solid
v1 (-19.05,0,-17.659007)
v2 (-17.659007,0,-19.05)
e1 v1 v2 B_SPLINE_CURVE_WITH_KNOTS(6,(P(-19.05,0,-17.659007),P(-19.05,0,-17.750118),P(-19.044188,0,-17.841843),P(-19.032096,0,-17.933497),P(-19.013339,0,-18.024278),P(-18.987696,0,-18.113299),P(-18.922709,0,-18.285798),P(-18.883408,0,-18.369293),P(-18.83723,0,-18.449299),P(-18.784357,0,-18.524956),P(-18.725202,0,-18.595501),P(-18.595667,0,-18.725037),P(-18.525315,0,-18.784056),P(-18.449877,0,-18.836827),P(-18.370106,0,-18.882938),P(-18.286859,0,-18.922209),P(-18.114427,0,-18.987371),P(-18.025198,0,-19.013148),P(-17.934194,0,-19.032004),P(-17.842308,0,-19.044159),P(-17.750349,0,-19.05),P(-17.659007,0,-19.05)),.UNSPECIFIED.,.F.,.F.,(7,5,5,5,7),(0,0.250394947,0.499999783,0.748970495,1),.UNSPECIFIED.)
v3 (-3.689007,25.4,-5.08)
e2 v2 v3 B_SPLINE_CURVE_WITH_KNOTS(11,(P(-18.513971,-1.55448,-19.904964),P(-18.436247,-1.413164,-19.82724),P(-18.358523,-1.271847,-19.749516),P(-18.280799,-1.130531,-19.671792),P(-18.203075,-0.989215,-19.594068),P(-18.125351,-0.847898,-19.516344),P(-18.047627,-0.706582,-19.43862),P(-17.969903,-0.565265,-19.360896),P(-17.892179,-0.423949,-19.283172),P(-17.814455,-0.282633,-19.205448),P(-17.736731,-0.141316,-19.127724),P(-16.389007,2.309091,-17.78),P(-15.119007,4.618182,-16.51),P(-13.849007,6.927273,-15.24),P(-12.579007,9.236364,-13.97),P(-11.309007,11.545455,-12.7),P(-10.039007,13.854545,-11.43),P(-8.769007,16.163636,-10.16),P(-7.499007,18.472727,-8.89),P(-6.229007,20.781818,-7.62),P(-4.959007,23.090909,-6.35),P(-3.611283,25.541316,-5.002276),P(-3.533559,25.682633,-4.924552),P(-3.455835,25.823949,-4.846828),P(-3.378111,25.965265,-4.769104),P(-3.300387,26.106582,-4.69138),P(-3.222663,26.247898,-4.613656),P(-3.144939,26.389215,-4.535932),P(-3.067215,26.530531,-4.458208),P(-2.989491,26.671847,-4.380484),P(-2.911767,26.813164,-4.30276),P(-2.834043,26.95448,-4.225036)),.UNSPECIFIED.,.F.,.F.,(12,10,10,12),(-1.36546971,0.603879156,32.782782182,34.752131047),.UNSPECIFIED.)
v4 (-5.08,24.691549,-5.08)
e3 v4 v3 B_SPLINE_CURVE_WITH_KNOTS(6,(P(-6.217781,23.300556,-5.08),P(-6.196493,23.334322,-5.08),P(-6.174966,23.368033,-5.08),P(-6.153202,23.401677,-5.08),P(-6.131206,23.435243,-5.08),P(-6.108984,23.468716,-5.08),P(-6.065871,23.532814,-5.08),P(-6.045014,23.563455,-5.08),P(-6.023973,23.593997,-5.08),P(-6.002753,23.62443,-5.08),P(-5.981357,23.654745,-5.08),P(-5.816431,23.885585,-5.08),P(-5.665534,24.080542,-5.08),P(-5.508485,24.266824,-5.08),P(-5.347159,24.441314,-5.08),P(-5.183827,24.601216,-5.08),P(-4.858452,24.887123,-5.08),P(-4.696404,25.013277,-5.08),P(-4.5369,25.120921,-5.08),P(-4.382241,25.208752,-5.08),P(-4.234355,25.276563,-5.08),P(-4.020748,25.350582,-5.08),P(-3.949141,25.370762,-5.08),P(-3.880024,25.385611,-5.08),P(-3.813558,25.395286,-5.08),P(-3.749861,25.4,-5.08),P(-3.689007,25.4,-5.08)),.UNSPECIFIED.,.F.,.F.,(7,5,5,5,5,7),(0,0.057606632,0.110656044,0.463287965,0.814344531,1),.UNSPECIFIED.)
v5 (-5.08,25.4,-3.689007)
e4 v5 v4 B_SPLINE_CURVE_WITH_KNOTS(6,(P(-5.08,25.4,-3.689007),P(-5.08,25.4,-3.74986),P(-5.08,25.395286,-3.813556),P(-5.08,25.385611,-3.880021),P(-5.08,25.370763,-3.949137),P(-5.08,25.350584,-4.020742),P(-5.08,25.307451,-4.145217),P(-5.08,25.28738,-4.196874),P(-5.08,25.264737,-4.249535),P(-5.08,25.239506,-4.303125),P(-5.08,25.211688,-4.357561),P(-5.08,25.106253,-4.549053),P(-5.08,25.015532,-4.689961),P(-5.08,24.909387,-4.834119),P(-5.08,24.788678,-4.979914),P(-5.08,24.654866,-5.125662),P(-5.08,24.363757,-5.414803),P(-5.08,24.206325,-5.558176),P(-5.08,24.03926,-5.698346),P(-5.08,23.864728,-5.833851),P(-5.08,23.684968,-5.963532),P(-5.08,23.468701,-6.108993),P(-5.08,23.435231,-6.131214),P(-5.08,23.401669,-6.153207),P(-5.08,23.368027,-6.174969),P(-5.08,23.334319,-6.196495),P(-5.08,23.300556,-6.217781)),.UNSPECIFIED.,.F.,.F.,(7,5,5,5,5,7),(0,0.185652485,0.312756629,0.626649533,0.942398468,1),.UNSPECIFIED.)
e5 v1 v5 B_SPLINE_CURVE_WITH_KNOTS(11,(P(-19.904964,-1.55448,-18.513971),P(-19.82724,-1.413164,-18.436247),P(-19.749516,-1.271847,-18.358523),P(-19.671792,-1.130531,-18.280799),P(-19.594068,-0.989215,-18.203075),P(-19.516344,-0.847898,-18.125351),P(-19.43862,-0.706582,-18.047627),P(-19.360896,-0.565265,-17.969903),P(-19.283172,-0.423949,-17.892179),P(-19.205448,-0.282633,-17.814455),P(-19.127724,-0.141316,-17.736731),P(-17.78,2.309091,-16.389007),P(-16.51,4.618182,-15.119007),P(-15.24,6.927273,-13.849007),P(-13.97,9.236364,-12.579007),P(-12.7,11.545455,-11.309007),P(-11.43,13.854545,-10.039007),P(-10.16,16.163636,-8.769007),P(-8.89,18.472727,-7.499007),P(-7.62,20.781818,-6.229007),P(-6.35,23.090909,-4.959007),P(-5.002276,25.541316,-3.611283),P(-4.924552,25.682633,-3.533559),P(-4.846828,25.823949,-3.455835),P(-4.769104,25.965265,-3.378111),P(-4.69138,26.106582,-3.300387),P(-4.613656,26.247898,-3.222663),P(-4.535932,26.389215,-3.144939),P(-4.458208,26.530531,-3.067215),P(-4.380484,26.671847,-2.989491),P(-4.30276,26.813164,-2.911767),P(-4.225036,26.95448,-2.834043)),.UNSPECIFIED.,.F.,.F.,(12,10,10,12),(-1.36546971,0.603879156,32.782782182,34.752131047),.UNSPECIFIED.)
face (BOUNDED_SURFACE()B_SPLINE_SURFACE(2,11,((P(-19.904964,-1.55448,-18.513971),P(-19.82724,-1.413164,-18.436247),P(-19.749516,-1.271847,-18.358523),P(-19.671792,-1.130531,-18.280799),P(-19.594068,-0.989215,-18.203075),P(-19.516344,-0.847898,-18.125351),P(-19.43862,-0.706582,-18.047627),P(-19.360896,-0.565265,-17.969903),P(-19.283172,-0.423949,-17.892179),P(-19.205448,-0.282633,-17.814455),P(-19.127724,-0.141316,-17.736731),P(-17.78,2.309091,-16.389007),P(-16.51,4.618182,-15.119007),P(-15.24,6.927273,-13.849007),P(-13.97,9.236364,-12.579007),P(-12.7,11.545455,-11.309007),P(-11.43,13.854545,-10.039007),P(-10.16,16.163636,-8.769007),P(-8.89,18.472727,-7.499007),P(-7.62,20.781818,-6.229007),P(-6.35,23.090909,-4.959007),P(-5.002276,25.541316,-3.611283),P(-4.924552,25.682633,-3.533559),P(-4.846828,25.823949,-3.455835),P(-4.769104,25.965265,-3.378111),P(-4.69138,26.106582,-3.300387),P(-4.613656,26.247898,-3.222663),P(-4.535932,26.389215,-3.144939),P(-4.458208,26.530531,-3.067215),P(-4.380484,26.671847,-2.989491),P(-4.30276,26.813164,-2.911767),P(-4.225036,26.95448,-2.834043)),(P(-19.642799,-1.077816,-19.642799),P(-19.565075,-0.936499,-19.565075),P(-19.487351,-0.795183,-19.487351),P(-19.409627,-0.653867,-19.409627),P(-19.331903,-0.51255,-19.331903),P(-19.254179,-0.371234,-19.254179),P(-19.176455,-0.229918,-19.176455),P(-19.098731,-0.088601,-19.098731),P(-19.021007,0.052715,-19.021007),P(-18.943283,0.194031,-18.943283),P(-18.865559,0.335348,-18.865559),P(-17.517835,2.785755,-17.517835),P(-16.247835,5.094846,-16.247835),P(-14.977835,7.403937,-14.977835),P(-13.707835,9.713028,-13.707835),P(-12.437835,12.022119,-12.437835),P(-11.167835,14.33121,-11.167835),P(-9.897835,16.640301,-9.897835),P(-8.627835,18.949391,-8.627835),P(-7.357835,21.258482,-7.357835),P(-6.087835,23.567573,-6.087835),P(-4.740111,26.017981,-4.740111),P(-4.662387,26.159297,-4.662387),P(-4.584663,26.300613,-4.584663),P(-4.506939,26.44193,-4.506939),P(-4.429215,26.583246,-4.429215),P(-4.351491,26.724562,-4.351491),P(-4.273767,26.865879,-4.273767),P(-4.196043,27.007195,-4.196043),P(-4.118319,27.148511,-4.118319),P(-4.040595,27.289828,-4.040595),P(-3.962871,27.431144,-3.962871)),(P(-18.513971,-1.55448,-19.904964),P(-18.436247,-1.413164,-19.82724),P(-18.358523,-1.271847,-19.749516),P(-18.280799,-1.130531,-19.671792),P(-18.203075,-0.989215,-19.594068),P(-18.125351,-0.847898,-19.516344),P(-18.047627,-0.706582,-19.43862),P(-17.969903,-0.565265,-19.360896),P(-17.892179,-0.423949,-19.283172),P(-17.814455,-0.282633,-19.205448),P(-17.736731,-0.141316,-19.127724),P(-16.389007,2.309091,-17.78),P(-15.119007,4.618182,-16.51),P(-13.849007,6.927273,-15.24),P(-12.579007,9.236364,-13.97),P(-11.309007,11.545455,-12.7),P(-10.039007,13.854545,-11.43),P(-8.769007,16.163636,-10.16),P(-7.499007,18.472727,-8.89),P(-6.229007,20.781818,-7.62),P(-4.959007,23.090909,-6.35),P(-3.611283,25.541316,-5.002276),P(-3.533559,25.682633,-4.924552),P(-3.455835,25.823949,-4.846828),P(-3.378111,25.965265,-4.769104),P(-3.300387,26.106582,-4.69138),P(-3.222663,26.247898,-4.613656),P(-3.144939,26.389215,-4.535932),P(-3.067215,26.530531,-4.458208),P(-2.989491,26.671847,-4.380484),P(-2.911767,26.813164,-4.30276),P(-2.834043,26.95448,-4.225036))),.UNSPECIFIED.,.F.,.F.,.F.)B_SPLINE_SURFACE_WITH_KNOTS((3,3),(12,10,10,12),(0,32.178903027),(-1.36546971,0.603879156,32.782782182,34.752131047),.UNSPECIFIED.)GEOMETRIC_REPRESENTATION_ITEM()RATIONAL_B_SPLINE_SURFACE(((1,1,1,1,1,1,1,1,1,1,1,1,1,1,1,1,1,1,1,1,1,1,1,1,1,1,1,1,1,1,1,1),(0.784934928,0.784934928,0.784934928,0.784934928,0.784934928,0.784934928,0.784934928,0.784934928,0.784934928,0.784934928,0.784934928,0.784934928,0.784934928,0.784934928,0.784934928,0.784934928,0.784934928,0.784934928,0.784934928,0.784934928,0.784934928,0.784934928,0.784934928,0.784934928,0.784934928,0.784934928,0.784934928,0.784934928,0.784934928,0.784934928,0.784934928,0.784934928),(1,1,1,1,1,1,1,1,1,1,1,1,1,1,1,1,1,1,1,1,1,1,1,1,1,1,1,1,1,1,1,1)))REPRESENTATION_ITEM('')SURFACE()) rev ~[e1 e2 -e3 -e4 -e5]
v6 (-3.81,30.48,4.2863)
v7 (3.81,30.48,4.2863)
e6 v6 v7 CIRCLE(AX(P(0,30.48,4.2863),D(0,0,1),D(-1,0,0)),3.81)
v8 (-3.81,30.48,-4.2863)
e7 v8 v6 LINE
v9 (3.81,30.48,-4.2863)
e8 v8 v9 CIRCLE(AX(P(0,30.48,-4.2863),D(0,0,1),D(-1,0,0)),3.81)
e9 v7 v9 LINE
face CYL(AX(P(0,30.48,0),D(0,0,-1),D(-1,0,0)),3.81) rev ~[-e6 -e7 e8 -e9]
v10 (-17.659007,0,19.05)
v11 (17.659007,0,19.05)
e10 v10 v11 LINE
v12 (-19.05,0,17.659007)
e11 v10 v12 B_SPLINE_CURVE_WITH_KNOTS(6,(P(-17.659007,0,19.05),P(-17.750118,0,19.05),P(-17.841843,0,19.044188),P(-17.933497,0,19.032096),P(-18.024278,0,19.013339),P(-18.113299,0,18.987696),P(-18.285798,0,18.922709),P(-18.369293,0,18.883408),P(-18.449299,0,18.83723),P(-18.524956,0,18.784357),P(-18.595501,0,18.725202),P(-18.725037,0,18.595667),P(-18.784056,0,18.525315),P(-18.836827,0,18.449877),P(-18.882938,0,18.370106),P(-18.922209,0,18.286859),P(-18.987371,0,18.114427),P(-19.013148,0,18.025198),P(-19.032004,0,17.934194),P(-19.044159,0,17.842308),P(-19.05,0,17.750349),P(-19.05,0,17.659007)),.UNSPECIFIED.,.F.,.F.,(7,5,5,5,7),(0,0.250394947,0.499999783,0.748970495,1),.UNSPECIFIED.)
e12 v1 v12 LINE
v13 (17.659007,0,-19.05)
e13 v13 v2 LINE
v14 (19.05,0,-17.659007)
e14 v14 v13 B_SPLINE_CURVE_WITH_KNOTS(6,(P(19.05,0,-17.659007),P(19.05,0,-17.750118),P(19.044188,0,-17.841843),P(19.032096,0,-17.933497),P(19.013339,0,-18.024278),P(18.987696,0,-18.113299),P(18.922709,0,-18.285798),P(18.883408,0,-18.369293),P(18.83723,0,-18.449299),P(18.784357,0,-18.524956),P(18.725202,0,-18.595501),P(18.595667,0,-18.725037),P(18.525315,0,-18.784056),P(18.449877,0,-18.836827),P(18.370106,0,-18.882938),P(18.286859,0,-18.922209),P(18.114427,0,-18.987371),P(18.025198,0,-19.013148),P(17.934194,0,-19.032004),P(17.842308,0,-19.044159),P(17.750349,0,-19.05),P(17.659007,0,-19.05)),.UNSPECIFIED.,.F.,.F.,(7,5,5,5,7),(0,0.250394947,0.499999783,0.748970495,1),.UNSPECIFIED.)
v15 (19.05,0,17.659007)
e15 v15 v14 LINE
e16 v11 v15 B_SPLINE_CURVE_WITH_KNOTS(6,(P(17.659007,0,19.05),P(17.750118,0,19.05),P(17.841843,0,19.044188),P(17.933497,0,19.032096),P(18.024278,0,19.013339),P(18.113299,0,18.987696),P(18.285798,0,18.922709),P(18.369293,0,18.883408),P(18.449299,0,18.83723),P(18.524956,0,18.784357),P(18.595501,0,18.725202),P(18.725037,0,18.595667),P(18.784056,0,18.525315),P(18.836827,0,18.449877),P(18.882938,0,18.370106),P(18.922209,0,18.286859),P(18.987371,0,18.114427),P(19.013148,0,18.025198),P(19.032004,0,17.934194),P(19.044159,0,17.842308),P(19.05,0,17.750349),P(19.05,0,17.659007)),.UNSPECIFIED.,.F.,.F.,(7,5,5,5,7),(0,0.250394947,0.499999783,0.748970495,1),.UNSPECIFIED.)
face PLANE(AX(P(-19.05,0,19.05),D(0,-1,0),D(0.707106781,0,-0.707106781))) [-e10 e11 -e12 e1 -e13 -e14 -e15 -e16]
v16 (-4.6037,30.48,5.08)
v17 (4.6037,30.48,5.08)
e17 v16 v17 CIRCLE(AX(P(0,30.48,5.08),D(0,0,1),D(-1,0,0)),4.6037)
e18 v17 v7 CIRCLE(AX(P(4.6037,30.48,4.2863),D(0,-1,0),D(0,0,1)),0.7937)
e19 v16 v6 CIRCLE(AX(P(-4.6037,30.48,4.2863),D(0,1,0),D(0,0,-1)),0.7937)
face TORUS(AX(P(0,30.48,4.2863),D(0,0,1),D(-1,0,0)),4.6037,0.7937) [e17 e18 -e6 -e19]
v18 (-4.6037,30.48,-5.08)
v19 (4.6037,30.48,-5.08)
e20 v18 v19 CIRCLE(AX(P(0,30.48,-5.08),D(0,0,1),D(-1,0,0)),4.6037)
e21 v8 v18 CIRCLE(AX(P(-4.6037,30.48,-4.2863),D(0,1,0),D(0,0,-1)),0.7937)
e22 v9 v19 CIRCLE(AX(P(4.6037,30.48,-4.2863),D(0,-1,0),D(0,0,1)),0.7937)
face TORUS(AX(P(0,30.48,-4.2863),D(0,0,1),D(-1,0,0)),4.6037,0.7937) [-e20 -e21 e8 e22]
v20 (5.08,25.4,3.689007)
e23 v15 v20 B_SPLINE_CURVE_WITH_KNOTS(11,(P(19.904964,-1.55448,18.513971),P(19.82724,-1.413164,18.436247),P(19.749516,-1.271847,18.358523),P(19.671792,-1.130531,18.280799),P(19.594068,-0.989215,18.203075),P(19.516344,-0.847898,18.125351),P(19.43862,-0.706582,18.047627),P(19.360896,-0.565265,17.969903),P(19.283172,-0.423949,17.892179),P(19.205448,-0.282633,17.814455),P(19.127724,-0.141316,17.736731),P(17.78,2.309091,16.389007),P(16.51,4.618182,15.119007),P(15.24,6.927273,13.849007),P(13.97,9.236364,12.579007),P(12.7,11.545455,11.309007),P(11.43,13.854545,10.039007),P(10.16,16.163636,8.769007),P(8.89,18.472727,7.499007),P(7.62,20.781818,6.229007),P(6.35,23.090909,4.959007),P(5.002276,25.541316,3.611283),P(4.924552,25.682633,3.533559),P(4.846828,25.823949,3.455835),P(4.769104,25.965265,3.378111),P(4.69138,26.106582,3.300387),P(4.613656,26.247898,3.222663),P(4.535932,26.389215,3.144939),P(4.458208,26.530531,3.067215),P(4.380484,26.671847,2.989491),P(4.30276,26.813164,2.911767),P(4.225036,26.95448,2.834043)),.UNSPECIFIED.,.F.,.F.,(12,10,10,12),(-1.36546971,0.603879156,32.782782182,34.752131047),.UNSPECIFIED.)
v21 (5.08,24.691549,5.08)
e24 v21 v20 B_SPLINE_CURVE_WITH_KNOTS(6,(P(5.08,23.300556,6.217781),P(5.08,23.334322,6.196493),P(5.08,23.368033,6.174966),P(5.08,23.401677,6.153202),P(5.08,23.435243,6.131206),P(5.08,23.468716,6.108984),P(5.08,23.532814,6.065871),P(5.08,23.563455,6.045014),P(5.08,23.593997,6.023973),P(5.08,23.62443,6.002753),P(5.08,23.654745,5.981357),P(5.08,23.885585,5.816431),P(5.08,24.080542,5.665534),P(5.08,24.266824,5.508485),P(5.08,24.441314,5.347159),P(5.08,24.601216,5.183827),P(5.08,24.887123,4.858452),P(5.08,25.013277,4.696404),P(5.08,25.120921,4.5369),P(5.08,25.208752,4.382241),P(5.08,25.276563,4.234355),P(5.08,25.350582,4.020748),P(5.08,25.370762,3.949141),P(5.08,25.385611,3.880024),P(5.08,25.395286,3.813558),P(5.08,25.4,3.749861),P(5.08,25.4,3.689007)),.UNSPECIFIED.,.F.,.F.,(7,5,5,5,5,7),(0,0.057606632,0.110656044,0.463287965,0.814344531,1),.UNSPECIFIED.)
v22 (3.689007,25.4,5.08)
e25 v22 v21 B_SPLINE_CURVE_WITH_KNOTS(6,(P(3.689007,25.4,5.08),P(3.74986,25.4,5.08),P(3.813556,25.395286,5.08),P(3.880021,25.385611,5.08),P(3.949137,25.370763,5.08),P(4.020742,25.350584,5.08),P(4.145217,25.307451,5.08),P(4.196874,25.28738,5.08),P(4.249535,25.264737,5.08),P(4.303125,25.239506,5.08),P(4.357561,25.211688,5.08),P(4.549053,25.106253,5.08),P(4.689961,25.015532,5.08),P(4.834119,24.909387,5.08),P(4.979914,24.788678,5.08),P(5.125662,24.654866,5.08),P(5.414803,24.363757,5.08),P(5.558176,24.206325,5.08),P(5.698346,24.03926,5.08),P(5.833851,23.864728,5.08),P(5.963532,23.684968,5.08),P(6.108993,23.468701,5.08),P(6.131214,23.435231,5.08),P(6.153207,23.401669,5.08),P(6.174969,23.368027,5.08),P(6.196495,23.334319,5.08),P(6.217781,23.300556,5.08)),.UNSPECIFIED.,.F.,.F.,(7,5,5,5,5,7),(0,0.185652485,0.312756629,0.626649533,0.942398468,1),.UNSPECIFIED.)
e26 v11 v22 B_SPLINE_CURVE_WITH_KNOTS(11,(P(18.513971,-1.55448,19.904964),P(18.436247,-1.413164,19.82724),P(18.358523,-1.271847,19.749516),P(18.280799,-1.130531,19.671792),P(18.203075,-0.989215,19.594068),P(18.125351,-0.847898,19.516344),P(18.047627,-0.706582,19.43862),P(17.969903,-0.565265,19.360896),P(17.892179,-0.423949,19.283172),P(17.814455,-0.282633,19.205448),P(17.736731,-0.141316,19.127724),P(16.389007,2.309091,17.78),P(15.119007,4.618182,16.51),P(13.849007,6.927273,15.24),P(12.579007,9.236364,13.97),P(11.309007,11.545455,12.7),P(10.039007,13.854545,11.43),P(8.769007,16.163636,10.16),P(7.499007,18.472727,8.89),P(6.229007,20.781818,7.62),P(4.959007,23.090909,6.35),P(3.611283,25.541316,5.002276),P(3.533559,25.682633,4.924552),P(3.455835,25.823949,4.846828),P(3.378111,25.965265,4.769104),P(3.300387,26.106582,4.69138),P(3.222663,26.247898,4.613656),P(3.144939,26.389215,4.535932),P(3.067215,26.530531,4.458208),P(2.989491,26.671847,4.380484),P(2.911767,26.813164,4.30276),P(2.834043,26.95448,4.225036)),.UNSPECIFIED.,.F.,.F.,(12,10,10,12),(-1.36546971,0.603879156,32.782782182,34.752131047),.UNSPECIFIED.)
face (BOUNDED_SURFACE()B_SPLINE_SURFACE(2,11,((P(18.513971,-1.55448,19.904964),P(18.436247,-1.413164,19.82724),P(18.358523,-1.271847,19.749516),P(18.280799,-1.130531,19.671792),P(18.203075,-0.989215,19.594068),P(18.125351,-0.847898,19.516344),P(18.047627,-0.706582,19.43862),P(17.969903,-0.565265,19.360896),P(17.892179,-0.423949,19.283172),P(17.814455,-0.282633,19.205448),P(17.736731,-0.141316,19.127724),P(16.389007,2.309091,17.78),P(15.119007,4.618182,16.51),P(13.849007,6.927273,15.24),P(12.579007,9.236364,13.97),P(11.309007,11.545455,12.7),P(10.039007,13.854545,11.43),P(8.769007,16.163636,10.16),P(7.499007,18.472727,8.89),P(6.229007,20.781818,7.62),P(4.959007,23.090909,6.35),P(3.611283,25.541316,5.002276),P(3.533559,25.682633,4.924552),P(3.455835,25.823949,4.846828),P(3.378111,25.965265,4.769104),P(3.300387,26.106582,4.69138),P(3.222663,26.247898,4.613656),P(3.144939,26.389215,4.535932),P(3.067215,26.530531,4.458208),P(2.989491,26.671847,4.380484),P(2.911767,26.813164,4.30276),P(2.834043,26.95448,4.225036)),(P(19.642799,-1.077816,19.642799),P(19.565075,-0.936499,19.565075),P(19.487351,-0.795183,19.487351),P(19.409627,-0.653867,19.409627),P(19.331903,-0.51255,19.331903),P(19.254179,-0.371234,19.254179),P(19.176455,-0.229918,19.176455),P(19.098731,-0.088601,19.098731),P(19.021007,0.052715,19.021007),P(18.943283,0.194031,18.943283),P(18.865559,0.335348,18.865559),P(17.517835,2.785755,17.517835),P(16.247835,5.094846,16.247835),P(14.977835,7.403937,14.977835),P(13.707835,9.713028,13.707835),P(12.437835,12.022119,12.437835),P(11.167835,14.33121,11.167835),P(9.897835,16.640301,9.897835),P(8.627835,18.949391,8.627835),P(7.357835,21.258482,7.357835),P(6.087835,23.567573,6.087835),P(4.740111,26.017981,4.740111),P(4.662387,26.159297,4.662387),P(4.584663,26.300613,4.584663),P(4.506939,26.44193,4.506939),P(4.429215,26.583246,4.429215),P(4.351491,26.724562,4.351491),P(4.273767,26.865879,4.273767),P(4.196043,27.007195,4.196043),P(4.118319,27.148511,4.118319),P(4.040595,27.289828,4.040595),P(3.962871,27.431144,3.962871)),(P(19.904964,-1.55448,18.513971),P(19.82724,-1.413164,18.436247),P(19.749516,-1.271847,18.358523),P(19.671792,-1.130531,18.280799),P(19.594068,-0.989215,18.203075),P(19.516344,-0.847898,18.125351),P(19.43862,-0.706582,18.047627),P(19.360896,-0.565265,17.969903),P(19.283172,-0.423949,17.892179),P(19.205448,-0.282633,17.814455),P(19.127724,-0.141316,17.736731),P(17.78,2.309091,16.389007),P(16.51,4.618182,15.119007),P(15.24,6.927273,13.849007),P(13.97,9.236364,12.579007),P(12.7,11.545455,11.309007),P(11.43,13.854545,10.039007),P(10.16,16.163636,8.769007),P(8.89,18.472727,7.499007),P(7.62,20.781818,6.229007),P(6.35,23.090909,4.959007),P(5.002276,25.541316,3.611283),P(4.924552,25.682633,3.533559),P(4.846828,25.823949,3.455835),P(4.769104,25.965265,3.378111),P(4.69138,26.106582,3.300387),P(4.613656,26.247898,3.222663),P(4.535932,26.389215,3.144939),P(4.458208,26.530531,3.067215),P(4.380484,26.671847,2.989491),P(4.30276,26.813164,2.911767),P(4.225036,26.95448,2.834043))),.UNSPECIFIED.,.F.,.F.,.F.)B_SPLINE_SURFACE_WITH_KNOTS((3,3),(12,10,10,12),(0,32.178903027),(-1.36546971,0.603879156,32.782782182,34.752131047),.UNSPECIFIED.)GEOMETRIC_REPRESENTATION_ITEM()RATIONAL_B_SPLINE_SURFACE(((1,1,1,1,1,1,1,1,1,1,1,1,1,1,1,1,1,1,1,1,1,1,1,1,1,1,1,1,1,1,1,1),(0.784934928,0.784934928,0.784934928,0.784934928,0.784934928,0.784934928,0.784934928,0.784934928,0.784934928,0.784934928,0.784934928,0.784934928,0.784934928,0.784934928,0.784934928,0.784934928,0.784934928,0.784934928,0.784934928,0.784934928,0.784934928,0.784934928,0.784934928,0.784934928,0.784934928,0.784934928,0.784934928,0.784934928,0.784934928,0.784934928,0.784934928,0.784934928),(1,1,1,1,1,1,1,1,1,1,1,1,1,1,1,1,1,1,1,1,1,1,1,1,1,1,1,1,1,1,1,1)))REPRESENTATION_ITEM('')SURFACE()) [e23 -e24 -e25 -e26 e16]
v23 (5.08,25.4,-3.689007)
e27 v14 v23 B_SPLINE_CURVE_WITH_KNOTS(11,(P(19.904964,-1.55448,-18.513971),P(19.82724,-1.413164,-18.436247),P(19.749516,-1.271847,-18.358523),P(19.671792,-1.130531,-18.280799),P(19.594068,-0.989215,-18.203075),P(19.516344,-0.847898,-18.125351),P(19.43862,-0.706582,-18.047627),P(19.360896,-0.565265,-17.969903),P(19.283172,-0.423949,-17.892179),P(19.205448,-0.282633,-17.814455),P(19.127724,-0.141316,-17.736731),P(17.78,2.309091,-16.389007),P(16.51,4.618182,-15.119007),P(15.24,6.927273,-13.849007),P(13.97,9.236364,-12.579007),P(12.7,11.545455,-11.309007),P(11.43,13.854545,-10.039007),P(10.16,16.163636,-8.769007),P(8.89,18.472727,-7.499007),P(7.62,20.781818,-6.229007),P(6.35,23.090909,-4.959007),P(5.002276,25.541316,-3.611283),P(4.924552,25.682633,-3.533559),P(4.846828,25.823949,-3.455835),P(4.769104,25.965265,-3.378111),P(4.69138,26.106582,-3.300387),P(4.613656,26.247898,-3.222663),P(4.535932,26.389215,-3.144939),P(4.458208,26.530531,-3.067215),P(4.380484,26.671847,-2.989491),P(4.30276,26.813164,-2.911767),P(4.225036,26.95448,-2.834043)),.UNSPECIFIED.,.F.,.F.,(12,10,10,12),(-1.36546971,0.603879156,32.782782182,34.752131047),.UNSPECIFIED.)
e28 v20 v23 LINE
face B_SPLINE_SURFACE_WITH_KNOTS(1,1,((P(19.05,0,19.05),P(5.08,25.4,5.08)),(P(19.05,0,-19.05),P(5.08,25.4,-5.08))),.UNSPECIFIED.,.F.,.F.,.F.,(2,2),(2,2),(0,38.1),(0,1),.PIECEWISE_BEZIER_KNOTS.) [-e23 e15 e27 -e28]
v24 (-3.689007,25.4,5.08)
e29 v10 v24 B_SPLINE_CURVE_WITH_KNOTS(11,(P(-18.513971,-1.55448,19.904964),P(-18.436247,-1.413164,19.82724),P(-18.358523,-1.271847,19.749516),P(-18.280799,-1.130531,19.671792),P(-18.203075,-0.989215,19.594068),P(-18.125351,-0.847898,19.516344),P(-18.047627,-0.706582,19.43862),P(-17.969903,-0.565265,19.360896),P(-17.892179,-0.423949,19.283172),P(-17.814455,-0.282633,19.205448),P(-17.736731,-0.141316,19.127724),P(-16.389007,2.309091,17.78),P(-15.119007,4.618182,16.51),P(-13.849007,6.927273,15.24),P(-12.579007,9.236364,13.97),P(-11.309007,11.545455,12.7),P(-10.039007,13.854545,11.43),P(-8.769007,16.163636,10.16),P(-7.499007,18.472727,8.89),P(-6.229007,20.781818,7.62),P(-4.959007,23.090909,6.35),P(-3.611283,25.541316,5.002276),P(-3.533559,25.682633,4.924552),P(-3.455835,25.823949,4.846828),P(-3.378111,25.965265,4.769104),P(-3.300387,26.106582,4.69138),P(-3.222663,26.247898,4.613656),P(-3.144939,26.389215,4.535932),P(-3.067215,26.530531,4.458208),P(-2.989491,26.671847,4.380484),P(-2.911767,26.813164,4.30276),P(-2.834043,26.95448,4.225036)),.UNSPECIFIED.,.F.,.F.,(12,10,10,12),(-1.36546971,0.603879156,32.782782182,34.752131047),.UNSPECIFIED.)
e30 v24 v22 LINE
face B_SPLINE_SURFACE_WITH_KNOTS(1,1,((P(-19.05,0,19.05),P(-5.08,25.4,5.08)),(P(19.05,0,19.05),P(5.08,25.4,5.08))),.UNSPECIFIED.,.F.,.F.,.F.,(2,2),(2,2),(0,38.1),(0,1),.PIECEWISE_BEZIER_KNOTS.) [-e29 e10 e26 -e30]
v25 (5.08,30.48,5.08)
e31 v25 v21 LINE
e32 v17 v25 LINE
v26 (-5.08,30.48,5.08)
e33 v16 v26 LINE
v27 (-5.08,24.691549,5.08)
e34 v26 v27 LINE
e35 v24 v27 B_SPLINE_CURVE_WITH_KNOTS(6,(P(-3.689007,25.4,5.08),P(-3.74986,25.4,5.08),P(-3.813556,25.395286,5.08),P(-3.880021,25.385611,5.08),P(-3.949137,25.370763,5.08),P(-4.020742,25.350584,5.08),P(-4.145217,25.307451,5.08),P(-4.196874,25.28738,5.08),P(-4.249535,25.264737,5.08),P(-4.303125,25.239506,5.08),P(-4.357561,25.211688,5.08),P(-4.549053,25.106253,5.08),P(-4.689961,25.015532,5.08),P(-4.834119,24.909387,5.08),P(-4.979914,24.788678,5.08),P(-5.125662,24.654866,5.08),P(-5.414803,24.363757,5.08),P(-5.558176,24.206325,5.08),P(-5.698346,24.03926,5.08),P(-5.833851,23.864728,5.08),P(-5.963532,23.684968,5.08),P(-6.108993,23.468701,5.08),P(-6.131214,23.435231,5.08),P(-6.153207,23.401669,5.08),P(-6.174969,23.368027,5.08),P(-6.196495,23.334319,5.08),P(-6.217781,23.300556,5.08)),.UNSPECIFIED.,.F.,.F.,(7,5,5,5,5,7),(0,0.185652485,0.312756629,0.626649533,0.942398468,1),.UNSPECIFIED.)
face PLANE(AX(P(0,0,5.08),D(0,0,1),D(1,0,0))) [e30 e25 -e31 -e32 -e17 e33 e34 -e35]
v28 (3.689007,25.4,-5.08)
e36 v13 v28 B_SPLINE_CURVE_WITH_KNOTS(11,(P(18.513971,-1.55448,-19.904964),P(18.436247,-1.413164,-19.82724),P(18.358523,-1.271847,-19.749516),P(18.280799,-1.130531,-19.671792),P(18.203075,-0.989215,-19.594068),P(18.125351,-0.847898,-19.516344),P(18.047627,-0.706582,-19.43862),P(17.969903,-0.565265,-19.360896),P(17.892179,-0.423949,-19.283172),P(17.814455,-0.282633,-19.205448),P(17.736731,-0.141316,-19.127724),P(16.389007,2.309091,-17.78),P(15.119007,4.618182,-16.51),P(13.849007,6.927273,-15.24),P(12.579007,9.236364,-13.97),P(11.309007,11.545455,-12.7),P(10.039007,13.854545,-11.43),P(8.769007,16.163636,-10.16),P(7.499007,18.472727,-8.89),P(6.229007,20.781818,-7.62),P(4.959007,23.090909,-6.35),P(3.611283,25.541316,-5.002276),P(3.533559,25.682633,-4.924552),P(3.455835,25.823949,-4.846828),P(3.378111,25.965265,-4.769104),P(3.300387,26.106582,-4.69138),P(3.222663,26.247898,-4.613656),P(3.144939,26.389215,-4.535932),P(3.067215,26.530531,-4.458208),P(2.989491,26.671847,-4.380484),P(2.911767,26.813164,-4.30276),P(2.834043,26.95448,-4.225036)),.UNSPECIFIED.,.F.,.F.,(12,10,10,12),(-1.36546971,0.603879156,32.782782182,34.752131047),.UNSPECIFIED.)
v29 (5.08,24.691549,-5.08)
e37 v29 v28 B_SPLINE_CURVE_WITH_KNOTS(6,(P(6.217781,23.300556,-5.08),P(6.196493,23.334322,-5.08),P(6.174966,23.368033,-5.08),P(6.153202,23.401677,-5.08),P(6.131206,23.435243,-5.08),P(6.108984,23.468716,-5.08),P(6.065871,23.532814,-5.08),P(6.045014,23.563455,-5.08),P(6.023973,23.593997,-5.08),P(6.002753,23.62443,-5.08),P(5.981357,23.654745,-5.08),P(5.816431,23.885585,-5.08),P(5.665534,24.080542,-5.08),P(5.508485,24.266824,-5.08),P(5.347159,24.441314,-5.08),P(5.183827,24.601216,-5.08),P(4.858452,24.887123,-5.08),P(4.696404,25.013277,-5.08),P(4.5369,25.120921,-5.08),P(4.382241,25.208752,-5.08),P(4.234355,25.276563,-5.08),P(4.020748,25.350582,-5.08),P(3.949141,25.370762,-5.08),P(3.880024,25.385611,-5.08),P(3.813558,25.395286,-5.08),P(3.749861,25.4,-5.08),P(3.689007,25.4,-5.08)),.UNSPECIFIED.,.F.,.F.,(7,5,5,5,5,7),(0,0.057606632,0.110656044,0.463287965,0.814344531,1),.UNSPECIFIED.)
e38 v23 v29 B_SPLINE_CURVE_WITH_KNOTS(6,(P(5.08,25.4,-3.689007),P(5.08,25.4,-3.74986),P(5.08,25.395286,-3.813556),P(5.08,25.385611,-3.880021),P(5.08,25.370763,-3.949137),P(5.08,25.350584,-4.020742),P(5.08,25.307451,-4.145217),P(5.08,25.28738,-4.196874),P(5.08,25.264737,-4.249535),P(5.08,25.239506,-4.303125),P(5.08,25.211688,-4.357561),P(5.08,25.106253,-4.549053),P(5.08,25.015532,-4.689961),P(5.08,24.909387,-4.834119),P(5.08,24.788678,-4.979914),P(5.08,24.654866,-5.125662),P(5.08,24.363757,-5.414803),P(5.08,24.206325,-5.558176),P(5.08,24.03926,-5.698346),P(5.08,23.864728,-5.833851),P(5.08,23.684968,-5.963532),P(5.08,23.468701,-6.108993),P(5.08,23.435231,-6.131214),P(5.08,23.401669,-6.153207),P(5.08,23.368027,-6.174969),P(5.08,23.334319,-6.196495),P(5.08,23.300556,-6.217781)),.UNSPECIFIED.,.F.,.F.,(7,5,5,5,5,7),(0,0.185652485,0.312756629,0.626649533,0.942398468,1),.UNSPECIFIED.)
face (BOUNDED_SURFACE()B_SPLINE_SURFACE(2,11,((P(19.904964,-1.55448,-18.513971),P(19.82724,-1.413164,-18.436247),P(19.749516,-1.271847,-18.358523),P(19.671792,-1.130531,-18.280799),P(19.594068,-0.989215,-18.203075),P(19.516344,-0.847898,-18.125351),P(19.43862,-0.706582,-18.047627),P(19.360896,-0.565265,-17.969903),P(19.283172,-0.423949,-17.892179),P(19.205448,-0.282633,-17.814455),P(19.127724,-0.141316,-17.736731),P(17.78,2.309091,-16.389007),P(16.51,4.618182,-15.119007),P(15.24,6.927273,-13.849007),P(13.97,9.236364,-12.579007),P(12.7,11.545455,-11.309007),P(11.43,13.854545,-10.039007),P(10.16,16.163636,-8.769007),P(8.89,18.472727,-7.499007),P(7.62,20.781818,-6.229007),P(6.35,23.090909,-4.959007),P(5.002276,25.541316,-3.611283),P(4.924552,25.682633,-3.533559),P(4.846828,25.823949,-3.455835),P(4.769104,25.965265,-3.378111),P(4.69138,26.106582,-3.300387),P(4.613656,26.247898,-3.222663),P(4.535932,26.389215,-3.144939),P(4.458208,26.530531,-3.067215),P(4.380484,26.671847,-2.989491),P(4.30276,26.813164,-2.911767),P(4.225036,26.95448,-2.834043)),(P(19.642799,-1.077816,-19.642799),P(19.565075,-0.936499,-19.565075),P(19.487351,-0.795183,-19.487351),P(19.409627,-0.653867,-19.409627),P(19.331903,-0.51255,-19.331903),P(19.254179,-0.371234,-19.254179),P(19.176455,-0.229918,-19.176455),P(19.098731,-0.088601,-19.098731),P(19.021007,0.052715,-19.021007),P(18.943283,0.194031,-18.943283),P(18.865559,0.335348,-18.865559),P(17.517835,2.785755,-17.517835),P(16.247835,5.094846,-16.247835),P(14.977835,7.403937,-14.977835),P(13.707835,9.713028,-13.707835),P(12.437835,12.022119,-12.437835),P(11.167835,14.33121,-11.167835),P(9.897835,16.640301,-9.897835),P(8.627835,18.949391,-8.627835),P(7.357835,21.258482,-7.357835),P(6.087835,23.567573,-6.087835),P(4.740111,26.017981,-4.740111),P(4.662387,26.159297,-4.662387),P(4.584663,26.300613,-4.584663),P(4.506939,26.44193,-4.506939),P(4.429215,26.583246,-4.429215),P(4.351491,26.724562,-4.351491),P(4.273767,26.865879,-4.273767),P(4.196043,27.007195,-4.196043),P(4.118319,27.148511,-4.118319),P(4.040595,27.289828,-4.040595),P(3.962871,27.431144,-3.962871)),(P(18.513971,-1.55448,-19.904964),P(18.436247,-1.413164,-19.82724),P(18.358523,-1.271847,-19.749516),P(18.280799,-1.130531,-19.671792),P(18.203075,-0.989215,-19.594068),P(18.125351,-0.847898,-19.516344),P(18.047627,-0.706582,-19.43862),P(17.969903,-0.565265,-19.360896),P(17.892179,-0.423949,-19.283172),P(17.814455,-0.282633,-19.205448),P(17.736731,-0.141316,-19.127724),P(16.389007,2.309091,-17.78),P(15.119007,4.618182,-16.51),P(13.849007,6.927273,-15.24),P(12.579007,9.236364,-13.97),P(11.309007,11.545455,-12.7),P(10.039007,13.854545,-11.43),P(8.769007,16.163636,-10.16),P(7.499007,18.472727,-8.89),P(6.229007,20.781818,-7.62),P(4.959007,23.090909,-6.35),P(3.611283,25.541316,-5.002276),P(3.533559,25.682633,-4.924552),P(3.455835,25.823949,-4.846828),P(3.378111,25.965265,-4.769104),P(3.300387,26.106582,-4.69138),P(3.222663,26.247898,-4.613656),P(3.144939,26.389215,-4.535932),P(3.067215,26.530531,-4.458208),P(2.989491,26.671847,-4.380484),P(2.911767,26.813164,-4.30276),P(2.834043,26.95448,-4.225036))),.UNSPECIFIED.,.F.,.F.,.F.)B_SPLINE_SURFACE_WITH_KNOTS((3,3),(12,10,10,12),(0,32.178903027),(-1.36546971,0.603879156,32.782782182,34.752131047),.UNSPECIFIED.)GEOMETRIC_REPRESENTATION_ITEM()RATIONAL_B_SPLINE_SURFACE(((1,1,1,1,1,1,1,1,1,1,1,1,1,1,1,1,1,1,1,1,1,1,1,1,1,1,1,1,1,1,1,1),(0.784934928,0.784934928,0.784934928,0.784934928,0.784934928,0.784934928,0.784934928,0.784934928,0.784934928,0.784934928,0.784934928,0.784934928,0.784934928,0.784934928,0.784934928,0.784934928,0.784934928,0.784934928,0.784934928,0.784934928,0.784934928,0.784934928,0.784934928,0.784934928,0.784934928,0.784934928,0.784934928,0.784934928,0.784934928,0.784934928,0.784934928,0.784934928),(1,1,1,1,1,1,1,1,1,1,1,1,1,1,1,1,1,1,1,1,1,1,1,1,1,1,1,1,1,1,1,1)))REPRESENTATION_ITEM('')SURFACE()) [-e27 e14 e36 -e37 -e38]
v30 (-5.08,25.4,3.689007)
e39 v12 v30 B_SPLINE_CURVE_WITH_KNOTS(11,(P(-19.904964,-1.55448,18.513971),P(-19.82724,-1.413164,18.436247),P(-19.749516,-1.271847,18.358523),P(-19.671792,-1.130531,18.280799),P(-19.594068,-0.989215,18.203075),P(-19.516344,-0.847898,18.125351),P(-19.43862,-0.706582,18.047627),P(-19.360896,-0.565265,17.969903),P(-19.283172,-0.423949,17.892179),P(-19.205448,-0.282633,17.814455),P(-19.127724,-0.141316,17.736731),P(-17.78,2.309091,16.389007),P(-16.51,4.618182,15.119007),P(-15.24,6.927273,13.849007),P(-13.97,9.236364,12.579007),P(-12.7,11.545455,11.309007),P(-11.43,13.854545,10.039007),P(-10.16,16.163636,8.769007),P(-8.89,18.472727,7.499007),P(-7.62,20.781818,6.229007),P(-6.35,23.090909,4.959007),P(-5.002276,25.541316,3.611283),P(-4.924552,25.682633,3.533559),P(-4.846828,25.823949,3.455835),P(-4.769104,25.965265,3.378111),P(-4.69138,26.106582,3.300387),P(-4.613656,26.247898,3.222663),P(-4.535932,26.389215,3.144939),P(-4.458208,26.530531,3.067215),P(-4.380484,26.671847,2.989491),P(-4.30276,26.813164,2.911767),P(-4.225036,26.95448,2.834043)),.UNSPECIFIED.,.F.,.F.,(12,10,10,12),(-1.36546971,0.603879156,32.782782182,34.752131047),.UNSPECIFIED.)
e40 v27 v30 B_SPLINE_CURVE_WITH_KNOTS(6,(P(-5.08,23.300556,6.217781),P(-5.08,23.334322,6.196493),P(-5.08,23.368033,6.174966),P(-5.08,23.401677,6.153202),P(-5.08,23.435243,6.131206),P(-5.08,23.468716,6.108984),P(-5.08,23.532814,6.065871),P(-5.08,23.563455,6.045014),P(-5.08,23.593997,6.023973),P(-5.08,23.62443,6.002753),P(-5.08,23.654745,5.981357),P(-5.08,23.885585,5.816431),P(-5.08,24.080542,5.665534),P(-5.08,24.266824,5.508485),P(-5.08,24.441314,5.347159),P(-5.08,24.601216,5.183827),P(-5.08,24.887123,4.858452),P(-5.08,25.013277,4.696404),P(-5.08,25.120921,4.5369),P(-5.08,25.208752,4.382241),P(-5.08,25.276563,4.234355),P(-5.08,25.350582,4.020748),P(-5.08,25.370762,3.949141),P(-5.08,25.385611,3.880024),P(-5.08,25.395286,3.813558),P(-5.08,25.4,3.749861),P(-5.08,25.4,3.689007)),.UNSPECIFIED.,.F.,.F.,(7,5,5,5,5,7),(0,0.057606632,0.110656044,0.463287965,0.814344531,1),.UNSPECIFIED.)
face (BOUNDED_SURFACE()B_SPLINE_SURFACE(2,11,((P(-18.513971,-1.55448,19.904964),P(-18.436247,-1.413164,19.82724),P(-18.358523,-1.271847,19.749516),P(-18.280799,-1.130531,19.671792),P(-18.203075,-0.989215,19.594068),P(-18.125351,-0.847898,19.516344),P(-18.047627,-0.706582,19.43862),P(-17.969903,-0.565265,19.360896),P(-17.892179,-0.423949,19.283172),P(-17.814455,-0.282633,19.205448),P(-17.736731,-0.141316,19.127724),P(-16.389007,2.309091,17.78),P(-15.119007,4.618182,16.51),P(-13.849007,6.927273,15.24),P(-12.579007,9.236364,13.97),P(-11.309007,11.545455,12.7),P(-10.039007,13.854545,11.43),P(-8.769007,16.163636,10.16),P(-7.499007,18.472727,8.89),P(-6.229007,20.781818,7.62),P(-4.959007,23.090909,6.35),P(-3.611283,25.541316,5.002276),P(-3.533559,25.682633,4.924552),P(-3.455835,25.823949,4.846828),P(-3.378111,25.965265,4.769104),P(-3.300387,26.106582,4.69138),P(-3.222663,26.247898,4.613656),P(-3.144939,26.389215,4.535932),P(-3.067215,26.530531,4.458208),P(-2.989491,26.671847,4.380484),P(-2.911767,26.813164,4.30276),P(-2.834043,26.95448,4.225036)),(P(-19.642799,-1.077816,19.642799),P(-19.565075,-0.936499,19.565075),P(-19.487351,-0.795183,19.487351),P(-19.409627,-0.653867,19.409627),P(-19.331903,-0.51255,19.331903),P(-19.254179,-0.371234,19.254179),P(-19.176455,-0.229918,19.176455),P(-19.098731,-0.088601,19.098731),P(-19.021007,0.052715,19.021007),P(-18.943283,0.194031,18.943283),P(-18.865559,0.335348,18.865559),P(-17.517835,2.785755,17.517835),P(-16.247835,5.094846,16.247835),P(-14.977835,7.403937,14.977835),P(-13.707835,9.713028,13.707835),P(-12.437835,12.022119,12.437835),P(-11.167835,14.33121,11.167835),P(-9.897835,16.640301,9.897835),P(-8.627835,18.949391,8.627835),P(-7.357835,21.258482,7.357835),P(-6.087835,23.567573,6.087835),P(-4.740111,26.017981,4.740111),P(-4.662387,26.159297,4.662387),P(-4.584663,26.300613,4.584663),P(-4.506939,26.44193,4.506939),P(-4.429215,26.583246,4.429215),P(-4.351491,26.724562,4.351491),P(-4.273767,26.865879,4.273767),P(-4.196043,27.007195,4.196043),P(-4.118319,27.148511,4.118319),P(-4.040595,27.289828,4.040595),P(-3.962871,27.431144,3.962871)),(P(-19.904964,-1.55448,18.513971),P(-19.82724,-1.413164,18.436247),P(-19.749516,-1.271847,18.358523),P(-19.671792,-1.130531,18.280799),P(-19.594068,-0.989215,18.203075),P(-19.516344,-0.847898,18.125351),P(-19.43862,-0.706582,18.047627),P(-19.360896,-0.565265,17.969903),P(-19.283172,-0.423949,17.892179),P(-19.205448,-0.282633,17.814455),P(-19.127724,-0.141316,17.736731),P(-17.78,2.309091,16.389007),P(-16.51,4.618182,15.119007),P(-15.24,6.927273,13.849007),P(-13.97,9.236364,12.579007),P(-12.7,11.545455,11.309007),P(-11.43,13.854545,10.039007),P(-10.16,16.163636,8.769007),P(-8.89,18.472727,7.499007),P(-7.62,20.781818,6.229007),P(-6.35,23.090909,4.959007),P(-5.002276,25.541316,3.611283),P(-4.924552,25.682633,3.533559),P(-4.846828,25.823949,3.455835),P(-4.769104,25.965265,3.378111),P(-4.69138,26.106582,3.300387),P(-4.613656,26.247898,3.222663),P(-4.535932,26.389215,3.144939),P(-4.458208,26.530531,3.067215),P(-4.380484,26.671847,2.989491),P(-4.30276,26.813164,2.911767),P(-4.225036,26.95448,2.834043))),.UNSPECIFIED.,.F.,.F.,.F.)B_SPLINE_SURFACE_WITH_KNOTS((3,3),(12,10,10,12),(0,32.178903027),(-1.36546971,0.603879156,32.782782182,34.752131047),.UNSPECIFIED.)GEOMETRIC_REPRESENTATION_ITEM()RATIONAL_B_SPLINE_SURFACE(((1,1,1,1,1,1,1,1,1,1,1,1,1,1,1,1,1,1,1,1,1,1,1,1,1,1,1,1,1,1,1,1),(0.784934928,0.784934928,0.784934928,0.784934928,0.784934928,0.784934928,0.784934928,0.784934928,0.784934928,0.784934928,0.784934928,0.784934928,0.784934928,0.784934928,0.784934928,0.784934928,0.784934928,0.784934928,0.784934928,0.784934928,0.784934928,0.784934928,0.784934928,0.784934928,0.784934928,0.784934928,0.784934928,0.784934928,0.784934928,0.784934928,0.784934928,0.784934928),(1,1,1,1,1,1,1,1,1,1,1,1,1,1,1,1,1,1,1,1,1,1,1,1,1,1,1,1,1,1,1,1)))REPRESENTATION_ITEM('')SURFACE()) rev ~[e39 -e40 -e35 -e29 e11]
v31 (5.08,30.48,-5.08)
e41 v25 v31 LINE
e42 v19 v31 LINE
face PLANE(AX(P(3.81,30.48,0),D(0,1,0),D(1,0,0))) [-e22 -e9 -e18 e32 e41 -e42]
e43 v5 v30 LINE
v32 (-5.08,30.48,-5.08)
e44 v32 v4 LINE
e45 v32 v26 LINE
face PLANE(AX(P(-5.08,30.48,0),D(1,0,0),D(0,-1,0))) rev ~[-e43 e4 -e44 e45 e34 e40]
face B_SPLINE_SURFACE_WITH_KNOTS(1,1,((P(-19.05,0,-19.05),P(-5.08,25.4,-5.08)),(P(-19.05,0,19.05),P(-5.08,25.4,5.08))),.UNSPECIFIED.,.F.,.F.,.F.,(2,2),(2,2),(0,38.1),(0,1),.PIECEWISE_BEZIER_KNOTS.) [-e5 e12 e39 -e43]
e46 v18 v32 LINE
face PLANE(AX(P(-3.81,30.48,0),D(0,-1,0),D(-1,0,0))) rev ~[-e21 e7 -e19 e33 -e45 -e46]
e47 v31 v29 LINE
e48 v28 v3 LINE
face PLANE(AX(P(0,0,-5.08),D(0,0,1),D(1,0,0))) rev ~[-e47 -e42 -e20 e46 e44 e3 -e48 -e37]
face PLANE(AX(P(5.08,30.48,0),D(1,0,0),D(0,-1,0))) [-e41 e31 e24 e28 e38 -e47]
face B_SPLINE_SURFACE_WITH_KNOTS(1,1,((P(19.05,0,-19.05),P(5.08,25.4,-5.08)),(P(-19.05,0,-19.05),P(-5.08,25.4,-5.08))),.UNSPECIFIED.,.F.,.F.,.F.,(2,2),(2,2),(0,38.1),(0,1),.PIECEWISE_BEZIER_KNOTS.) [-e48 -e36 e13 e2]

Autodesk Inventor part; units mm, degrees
ref_plane "YZ Plane" through (0, 0, 0) normal (1, 0, 0) x (0, 1, 0)
sketch "Sketch1" plane through (0, 0, 0) normal (0, 1, 0) x (-1, 0, 0)
  line L0 (-19.05, 19.05) -> (-19.05, -19.05)
  line L1 (-19.05, -19.05) -> (19.05, -19.05)
  line L2 (19.05, -19.05) -> (19.05, 19.05)
  line L3 (19.05, 19.05) -> (-19.05, 19.05)
  line L4 (-19.05, 19.05) -> (19.05, -19.05) construction
  line L5 (-19.05, -19.05) -> (19.05, 19.05) construction
  point P0 (0, 0)
  dimension "base" = 38.1
ref_plane "Work Plane1" through (0, 25.4, 0) normal (0, 1, 0) x (-1, 0, 0)
sketch "Sketch2" plane through (0, 25.4, 0) normal (0, 1, 0) x (-1, 0, 0)
  line L0 (-5.08, 5.08) -> (-5.08, -5.08)
  line L1 (-5.08, -5.08) -> (5.08, -5.08)
  line L2 (5.08, -5.08) -> (5.08, 5.08)
  line L3 (5.08, 5.08) -> (-5.08, 5.08)
  line L4 (-5.08, 5.08) -> (5.08, -5.08) construction
  line L5 (-5.08, -5.08) -> (5.08, 5.08) construction
  point P0 (0, 0)
  dimension "topOfPyramid" = 10.16
loft "Loft1" add profiles "Sketch1", "Sketch2"
sketch "Sketch3" plane through (0, 0, 0) normal (0, 0, 1) x (1, 0, 0)
  arc A0 (-3.81, 30.48) -> (3.81, 30.48) centre (0, 30.48) ccw
  arc A1 (-5.08, 30.48) -> (5.08, 30.48) centre (0, 30.48) ccw
  line L0 (5.08, 25.4) -> (-5.08, 25.4) projected
  line L1 (3.81, 30.48) -> (5.08, 30.48)
  line L2 (-3.81, 30.48) -> (-5.08, 30.48)
  line L3 (-5.08, 30.48) -> (-5.08, 25.4)
  line L4 (5.08, 30.48) -> (5.08, 25.4)
  line L5 (19.05, 0) -> (5.08, 25.4) projected
  line L6 (5.08, 25.4) -> (0, 25.4)
  line L7 (-5.08, 25.4) -> (5.08, 25.4) projected
  line L8 (-5.08, 25.4) -> (0, 25.4)
  point P0 (0, 0)
  dimension "innerDiamForRope" = 7.62
  dimension "centerForRope" = 5.08
  dimension "outsideDiam" = 10.16
extrude "Extrusion1" add sketch "Sketch3" along normal mid plane 10.16
fillet "Fillet3" radius 1.5875 4 edges at (12.065, 12.7, 12.065) (12.065, 12.7, -12.065) (-12.065, 12.7, 12.065) (-12.065, 12.7, -12.065)
fillet "Fillet5" radius 0.7937 2 edges at (0, 26.67, 5.08) (0, 26.67, -5.08)
ref_plane "Work Plane2" through (0, 0, 19.05) normal (0, 0, 1) x (1, 0, 0)
equation "\"centerForRope\" = 0.5 * outsideDiam"
equation "\"widthOfTop\" = topOfPyramid"
equation "\"d17\" = 0.5 * base"
properties part number "OutdoorSupportForMouseWire"
